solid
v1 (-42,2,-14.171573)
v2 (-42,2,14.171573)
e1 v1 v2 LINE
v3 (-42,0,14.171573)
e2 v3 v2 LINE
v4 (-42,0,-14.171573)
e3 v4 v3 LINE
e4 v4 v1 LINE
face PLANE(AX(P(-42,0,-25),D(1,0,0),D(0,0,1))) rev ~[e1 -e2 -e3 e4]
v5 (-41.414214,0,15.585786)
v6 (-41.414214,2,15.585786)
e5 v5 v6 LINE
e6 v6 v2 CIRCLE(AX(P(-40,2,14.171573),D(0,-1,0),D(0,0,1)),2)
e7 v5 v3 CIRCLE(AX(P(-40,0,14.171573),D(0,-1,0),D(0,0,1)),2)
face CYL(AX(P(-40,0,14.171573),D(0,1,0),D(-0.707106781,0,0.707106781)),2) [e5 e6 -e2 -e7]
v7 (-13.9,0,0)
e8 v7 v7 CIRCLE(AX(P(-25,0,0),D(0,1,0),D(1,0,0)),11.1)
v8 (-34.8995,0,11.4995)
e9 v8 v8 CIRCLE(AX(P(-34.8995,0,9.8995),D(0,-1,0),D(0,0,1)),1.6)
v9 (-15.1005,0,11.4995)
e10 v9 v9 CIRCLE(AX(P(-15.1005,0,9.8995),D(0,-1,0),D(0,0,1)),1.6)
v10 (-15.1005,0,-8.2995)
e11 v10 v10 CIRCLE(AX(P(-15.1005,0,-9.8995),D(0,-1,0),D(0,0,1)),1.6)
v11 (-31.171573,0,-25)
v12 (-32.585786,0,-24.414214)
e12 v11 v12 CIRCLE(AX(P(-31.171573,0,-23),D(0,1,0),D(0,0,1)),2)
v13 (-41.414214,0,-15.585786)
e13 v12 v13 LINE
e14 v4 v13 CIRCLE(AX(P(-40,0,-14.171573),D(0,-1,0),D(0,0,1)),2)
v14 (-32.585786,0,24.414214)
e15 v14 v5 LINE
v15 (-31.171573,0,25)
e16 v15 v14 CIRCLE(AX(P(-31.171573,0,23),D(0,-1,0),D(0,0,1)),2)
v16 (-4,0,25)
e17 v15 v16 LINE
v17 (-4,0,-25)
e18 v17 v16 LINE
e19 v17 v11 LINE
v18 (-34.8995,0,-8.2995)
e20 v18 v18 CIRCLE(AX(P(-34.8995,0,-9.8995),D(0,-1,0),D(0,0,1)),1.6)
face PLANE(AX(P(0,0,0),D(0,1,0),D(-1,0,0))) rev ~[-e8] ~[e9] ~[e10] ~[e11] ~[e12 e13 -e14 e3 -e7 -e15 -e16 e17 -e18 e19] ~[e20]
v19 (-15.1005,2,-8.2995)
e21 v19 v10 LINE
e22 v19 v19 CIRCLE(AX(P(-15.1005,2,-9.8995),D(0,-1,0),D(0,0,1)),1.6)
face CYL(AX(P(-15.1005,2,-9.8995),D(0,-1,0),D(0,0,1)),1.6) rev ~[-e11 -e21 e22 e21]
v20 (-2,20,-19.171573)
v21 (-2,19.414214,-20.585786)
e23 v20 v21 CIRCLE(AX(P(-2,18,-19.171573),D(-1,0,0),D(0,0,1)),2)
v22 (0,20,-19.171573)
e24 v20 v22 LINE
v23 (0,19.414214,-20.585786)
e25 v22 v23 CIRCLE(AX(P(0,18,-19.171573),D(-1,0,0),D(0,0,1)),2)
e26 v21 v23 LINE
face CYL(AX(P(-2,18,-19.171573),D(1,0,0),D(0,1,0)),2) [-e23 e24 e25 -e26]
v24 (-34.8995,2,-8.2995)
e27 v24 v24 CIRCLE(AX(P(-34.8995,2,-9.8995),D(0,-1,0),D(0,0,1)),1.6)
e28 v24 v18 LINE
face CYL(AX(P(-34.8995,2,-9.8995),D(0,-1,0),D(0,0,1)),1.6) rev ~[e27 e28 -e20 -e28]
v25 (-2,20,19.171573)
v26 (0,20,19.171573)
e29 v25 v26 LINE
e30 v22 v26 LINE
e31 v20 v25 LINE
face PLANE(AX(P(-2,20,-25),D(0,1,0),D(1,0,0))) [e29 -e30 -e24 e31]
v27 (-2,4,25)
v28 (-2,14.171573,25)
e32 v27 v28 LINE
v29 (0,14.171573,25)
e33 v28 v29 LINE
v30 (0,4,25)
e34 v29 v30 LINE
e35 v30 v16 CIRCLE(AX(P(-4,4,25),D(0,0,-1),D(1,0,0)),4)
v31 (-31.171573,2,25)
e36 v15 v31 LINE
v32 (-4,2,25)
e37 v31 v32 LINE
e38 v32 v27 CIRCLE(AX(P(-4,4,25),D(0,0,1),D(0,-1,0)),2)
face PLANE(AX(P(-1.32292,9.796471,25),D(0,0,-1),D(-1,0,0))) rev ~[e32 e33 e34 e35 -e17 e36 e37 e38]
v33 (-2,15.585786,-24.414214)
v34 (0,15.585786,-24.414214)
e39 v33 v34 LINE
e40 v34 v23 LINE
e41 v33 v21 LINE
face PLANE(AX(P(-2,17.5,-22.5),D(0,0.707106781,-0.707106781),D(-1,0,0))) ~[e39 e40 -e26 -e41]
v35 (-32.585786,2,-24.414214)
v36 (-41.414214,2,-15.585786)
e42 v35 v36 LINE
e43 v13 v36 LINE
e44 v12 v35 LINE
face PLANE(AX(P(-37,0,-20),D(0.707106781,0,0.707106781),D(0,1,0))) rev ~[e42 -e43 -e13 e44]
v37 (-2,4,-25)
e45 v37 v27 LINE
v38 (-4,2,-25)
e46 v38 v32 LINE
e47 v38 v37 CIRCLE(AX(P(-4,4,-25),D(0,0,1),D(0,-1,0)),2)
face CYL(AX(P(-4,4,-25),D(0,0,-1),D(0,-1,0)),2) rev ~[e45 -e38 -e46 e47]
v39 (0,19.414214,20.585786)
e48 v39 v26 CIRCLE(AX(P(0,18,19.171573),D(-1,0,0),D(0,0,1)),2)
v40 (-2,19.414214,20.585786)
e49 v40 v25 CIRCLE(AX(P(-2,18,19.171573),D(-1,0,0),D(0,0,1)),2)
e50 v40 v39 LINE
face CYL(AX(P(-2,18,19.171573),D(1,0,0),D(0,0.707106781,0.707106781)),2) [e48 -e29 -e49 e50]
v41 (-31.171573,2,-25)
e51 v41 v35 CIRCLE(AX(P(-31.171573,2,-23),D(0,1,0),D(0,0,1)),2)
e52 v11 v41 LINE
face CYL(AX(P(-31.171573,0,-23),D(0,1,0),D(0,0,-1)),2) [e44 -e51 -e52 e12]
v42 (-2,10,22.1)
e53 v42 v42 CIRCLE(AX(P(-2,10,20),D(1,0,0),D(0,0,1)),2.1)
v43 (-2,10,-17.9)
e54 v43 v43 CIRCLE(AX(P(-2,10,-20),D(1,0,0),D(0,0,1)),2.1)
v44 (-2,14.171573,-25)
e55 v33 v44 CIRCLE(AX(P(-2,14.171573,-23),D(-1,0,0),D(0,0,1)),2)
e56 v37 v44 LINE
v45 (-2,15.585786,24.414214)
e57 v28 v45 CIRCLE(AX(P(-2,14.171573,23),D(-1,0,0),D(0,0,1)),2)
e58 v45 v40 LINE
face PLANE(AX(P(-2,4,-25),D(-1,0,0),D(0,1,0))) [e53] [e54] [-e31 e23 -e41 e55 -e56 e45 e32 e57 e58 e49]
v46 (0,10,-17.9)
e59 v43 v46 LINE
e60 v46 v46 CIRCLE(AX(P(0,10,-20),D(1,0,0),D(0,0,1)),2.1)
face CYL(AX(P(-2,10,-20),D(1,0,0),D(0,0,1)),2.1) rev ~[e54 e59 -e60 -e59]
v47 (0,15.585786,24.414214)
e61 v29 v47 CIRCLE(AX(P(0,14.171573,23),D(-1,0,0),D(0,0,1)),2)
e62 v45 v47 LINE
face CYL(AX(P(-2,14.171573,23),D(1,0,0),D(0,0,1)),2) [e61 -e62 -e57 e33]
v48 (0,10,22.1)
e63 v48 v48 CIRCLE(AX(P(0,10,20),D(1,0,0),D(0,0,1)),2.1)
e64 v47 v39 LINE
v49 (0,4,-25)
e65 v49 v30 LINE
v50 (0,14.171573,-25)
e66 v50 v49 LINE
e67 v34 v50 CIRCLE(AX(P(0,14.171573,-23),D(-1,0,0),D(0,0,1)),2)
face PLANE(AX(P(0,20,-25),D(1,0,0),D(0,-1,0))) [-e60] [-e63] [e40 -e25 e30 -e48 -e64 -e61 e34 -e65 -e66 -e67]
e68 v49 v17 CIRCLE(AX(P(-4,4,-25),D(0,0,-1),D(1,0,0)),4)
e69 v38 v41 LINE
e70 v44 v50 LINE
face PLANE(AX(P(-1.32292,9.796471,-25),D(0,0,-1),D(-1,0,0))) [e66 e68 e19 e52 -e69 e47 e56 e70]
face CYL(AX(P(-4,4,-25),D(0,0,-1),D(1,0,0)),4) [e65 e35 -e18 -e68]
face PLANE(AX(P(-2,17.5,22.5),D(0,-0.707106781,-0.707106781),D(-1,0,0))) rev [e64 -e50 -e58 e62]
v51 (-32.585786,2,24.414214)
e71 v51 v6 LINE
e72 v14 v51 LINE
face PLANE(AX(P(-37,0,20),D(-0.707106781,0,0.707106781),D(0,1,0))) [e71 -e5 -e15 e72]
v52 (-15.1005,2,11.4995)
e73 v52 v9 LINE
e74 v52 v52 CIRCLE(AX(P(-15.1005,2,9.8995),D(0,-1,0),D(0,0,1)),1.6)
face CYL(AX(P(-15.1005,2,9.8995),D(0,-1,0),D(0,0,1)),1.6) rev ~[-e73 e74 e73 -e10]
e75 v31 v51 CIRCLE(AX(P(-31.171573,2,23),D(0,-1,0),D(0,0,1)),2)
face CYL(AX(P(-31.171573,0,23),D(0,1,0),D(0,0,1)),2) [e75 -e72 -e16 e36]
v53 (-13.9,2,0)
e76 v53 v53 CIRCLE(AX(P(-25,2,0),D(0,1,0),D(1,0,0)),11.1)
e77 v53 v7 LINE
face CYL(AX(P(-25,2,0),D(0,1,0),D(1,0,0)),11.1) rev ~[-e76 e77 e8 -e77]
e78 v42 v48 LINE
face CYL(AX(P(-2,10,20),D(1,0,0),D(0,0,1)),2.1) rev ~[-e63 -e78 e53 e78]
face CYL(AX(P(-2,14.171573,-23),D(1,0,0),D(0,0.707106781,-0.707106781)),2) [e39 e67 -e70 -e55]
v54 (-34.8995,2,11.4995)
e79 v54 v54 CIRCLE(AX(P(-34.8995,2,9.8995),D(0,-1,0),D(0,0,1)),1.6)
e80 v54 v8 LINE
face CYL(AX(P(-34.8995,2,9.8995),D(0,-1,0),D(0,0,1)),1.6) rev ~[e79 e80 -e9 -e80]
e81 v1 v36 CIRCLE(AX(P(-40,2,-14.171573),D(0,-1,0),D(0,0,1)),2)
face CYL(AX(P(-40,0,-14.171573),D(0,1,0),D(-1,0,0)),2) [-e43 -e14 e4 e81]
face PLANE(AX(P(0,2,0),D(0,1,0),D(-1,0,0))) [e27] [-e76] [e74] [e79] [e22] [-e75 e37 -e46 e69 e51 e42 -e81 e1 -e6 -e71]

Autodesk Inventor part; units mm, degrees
ref_plane "YZ Plane" through (0, 0, 0) normal (1, 0, 0) x (0, 1, 0)
ref_plane "XZ Plane" through (0, 0, 0) normal (0, 1, 0) x (-1, 0, 0)
ref_plane "XY Plane" through (0, 0, 0) normal (0, 0, 1) x (1, 0, 0)
sketch "スケッチ1" plane through (0, 0, 0) normal (0, 1, 0) x (-1, 0, 0)
  line L0 (0, -25) -> (42, -25)
  line L1 (42, -25) -> (42, 25)
  line L2 (42, 25) -> (0, 25)
  line L3 (0, 25) -> (0, -25)
  point P0 (0, 0)
  dimension "d0" = 42
  dimension "d1" = 50
  dimension "d40" = 25
extrude "プレート1" add sketch "スケッチ1" along normal blind 2
sketch "スケッチ4" plane through (0, 2, 0) normal (0, 1, 0) x (1, 0, 0)
  circle A0 centre (-25, 0) radius 11.1
  line L0 (0, 25) -> (0, -25) projected
  point P0 (0, 0)
  dimension "d23" = 22.2
  dimension "d24" = 25
extrude "押し出し1" cut sketch "スケッチ4" against normal blind 10
sketch "スケッチ5" plane through (0, 2, 0) normal (0, 1, 0) x (1, 0, 0)
  circle A0 centre (-25, 0) radius 11.1 projected
  line L0 (0, 25) -> (0, -25) projected
  line L1 (-42, 25) -> (0, 25) projected
  line L2 (-42, -25) -> (-42, 25) projected
  line L3 (0, -25) -> (-42, -25) projected
  circle A1 centre (-25, 0) radius 14
  point P0 (0, 0)
  point P1 (-34.8995, -9.8995)
  point P2 (-15.1005, -9.8995)
  point P3 (-15.1005, 9.8995)
  point P4 (-34.8995, 9.8995)
  dimension "d28" = 28
  dimension "d31" = 360
hole "穴2" at (-34.8995, 2, 9.8995) at (-15.1005, 2, 9.8995) at (-15.1005, 2, -9.8995) at (-34.8995, 2, -9.8995) direction (0, -1, 0) diameter 3.2 end through all
sketch "スケッチ10" plane through (-2, 0, -25) normal (1, 0, 0) x (0, 1, 0)
  line L0 (0, 50) -> (0, 0)
  line L1 (0, 0) -> (20, 0)
  line L2 (20, 0) -> (20, 50)
  line L3 (20, 50) -> (0, 50)
edge flange "フランジ4" height 20 angle 90 thickness 2 bend radius 2 thickness toward (1, 0, 0) relief tear relief width 2 relief depth 1 edges at (0, 2, 0) wall of the first edge with corners at (-2, 0, 25) (-2, 0, -25) (-2, 20, -25) (-2, 20, 25)
bend "曲げ4"
corner "コーナー4"
sketch "スケッチ12" plane through (-2, 20, -25) normal (-1, 0, 0) x (0, 0, 1)
  line L0 (0, -16) -> (50, -16) projected
  line L1 (50, -16) -> (50, 0) projected
  line L2 (50, 0) -> (0, 0) projected
  line L3 (0, -16) -> (0, 0) projected
  line L4 (45, -10) -> (5, -10)
  point P0 (25, -20)
  point P1 (25, -10)
  dimension "d77" = 40
  dimension "d78" = 10
  dimension "d79" = 25
  dimension "d80" = 50
hole "穴3" at (-2, 10, -20) at (-2, 10, 20) direction (1, 0, 0) diameter 4.2 end through all
chamfer "面取り1" distance 10 angle 45 2 edges at (-42, 1, 25) (-42, 1, -25)
fillet "フィレット1" radius 2 4 edges at (-32, 1, -25) (-42, 1, -15) (-42, 1, 15) (-32, 1, 25)
chamfer "面取り2" distance 5 angle 45 2 edges at (-1, 20, -25) (-1, 20, 25)
fillet "フィレット2" radius 2 4 edges at (-1, 15, -25) (-1, 20, -20) (-1, 20, 20) (-1, 15, 25)
equation "\"d38\" = Thickness"
equation "\"d79\" = 0.5 * d80"
equation "\"d86\" = Thickness"
equation "\"d2\" = Thickness"
equation "\"d67\" = BendReliefWidth"
equation "\"d68\" = BendReliefDepth"
equation "\"d69\" = MinimumRemnant"
equation "\"d70\" = TransitionRadius"
equation "\"d73\" = BendRadius"
equation "\"d74\" = CornerReliefSize"
equation "\"d75\" = GapSize"
equation "\"d76\" = JacobiRadiusSize"
equation "\"d40\" = 0.5 * d1"
equation "\"BendRadius\" = Thickness"
equation "\"BendReliefWidth\" = Thickness"
equation "\"BendReliefDepth\" = 0.5 * Thickness"
equation "\"CornerReliefSize\" = 4 * Thickness"
equation "\"MinimumRemnant\" = 2 * Thickness"
equation "\"TransitionRadius\" = BendRadius"
equation "\"JacobiRadiusSize\" = BendRadius"
equation "\"GapSize\" = Thickness"
equation "\"Thickness\" = 2"
properties part number "Belt_Unit_Motor_Holder"
